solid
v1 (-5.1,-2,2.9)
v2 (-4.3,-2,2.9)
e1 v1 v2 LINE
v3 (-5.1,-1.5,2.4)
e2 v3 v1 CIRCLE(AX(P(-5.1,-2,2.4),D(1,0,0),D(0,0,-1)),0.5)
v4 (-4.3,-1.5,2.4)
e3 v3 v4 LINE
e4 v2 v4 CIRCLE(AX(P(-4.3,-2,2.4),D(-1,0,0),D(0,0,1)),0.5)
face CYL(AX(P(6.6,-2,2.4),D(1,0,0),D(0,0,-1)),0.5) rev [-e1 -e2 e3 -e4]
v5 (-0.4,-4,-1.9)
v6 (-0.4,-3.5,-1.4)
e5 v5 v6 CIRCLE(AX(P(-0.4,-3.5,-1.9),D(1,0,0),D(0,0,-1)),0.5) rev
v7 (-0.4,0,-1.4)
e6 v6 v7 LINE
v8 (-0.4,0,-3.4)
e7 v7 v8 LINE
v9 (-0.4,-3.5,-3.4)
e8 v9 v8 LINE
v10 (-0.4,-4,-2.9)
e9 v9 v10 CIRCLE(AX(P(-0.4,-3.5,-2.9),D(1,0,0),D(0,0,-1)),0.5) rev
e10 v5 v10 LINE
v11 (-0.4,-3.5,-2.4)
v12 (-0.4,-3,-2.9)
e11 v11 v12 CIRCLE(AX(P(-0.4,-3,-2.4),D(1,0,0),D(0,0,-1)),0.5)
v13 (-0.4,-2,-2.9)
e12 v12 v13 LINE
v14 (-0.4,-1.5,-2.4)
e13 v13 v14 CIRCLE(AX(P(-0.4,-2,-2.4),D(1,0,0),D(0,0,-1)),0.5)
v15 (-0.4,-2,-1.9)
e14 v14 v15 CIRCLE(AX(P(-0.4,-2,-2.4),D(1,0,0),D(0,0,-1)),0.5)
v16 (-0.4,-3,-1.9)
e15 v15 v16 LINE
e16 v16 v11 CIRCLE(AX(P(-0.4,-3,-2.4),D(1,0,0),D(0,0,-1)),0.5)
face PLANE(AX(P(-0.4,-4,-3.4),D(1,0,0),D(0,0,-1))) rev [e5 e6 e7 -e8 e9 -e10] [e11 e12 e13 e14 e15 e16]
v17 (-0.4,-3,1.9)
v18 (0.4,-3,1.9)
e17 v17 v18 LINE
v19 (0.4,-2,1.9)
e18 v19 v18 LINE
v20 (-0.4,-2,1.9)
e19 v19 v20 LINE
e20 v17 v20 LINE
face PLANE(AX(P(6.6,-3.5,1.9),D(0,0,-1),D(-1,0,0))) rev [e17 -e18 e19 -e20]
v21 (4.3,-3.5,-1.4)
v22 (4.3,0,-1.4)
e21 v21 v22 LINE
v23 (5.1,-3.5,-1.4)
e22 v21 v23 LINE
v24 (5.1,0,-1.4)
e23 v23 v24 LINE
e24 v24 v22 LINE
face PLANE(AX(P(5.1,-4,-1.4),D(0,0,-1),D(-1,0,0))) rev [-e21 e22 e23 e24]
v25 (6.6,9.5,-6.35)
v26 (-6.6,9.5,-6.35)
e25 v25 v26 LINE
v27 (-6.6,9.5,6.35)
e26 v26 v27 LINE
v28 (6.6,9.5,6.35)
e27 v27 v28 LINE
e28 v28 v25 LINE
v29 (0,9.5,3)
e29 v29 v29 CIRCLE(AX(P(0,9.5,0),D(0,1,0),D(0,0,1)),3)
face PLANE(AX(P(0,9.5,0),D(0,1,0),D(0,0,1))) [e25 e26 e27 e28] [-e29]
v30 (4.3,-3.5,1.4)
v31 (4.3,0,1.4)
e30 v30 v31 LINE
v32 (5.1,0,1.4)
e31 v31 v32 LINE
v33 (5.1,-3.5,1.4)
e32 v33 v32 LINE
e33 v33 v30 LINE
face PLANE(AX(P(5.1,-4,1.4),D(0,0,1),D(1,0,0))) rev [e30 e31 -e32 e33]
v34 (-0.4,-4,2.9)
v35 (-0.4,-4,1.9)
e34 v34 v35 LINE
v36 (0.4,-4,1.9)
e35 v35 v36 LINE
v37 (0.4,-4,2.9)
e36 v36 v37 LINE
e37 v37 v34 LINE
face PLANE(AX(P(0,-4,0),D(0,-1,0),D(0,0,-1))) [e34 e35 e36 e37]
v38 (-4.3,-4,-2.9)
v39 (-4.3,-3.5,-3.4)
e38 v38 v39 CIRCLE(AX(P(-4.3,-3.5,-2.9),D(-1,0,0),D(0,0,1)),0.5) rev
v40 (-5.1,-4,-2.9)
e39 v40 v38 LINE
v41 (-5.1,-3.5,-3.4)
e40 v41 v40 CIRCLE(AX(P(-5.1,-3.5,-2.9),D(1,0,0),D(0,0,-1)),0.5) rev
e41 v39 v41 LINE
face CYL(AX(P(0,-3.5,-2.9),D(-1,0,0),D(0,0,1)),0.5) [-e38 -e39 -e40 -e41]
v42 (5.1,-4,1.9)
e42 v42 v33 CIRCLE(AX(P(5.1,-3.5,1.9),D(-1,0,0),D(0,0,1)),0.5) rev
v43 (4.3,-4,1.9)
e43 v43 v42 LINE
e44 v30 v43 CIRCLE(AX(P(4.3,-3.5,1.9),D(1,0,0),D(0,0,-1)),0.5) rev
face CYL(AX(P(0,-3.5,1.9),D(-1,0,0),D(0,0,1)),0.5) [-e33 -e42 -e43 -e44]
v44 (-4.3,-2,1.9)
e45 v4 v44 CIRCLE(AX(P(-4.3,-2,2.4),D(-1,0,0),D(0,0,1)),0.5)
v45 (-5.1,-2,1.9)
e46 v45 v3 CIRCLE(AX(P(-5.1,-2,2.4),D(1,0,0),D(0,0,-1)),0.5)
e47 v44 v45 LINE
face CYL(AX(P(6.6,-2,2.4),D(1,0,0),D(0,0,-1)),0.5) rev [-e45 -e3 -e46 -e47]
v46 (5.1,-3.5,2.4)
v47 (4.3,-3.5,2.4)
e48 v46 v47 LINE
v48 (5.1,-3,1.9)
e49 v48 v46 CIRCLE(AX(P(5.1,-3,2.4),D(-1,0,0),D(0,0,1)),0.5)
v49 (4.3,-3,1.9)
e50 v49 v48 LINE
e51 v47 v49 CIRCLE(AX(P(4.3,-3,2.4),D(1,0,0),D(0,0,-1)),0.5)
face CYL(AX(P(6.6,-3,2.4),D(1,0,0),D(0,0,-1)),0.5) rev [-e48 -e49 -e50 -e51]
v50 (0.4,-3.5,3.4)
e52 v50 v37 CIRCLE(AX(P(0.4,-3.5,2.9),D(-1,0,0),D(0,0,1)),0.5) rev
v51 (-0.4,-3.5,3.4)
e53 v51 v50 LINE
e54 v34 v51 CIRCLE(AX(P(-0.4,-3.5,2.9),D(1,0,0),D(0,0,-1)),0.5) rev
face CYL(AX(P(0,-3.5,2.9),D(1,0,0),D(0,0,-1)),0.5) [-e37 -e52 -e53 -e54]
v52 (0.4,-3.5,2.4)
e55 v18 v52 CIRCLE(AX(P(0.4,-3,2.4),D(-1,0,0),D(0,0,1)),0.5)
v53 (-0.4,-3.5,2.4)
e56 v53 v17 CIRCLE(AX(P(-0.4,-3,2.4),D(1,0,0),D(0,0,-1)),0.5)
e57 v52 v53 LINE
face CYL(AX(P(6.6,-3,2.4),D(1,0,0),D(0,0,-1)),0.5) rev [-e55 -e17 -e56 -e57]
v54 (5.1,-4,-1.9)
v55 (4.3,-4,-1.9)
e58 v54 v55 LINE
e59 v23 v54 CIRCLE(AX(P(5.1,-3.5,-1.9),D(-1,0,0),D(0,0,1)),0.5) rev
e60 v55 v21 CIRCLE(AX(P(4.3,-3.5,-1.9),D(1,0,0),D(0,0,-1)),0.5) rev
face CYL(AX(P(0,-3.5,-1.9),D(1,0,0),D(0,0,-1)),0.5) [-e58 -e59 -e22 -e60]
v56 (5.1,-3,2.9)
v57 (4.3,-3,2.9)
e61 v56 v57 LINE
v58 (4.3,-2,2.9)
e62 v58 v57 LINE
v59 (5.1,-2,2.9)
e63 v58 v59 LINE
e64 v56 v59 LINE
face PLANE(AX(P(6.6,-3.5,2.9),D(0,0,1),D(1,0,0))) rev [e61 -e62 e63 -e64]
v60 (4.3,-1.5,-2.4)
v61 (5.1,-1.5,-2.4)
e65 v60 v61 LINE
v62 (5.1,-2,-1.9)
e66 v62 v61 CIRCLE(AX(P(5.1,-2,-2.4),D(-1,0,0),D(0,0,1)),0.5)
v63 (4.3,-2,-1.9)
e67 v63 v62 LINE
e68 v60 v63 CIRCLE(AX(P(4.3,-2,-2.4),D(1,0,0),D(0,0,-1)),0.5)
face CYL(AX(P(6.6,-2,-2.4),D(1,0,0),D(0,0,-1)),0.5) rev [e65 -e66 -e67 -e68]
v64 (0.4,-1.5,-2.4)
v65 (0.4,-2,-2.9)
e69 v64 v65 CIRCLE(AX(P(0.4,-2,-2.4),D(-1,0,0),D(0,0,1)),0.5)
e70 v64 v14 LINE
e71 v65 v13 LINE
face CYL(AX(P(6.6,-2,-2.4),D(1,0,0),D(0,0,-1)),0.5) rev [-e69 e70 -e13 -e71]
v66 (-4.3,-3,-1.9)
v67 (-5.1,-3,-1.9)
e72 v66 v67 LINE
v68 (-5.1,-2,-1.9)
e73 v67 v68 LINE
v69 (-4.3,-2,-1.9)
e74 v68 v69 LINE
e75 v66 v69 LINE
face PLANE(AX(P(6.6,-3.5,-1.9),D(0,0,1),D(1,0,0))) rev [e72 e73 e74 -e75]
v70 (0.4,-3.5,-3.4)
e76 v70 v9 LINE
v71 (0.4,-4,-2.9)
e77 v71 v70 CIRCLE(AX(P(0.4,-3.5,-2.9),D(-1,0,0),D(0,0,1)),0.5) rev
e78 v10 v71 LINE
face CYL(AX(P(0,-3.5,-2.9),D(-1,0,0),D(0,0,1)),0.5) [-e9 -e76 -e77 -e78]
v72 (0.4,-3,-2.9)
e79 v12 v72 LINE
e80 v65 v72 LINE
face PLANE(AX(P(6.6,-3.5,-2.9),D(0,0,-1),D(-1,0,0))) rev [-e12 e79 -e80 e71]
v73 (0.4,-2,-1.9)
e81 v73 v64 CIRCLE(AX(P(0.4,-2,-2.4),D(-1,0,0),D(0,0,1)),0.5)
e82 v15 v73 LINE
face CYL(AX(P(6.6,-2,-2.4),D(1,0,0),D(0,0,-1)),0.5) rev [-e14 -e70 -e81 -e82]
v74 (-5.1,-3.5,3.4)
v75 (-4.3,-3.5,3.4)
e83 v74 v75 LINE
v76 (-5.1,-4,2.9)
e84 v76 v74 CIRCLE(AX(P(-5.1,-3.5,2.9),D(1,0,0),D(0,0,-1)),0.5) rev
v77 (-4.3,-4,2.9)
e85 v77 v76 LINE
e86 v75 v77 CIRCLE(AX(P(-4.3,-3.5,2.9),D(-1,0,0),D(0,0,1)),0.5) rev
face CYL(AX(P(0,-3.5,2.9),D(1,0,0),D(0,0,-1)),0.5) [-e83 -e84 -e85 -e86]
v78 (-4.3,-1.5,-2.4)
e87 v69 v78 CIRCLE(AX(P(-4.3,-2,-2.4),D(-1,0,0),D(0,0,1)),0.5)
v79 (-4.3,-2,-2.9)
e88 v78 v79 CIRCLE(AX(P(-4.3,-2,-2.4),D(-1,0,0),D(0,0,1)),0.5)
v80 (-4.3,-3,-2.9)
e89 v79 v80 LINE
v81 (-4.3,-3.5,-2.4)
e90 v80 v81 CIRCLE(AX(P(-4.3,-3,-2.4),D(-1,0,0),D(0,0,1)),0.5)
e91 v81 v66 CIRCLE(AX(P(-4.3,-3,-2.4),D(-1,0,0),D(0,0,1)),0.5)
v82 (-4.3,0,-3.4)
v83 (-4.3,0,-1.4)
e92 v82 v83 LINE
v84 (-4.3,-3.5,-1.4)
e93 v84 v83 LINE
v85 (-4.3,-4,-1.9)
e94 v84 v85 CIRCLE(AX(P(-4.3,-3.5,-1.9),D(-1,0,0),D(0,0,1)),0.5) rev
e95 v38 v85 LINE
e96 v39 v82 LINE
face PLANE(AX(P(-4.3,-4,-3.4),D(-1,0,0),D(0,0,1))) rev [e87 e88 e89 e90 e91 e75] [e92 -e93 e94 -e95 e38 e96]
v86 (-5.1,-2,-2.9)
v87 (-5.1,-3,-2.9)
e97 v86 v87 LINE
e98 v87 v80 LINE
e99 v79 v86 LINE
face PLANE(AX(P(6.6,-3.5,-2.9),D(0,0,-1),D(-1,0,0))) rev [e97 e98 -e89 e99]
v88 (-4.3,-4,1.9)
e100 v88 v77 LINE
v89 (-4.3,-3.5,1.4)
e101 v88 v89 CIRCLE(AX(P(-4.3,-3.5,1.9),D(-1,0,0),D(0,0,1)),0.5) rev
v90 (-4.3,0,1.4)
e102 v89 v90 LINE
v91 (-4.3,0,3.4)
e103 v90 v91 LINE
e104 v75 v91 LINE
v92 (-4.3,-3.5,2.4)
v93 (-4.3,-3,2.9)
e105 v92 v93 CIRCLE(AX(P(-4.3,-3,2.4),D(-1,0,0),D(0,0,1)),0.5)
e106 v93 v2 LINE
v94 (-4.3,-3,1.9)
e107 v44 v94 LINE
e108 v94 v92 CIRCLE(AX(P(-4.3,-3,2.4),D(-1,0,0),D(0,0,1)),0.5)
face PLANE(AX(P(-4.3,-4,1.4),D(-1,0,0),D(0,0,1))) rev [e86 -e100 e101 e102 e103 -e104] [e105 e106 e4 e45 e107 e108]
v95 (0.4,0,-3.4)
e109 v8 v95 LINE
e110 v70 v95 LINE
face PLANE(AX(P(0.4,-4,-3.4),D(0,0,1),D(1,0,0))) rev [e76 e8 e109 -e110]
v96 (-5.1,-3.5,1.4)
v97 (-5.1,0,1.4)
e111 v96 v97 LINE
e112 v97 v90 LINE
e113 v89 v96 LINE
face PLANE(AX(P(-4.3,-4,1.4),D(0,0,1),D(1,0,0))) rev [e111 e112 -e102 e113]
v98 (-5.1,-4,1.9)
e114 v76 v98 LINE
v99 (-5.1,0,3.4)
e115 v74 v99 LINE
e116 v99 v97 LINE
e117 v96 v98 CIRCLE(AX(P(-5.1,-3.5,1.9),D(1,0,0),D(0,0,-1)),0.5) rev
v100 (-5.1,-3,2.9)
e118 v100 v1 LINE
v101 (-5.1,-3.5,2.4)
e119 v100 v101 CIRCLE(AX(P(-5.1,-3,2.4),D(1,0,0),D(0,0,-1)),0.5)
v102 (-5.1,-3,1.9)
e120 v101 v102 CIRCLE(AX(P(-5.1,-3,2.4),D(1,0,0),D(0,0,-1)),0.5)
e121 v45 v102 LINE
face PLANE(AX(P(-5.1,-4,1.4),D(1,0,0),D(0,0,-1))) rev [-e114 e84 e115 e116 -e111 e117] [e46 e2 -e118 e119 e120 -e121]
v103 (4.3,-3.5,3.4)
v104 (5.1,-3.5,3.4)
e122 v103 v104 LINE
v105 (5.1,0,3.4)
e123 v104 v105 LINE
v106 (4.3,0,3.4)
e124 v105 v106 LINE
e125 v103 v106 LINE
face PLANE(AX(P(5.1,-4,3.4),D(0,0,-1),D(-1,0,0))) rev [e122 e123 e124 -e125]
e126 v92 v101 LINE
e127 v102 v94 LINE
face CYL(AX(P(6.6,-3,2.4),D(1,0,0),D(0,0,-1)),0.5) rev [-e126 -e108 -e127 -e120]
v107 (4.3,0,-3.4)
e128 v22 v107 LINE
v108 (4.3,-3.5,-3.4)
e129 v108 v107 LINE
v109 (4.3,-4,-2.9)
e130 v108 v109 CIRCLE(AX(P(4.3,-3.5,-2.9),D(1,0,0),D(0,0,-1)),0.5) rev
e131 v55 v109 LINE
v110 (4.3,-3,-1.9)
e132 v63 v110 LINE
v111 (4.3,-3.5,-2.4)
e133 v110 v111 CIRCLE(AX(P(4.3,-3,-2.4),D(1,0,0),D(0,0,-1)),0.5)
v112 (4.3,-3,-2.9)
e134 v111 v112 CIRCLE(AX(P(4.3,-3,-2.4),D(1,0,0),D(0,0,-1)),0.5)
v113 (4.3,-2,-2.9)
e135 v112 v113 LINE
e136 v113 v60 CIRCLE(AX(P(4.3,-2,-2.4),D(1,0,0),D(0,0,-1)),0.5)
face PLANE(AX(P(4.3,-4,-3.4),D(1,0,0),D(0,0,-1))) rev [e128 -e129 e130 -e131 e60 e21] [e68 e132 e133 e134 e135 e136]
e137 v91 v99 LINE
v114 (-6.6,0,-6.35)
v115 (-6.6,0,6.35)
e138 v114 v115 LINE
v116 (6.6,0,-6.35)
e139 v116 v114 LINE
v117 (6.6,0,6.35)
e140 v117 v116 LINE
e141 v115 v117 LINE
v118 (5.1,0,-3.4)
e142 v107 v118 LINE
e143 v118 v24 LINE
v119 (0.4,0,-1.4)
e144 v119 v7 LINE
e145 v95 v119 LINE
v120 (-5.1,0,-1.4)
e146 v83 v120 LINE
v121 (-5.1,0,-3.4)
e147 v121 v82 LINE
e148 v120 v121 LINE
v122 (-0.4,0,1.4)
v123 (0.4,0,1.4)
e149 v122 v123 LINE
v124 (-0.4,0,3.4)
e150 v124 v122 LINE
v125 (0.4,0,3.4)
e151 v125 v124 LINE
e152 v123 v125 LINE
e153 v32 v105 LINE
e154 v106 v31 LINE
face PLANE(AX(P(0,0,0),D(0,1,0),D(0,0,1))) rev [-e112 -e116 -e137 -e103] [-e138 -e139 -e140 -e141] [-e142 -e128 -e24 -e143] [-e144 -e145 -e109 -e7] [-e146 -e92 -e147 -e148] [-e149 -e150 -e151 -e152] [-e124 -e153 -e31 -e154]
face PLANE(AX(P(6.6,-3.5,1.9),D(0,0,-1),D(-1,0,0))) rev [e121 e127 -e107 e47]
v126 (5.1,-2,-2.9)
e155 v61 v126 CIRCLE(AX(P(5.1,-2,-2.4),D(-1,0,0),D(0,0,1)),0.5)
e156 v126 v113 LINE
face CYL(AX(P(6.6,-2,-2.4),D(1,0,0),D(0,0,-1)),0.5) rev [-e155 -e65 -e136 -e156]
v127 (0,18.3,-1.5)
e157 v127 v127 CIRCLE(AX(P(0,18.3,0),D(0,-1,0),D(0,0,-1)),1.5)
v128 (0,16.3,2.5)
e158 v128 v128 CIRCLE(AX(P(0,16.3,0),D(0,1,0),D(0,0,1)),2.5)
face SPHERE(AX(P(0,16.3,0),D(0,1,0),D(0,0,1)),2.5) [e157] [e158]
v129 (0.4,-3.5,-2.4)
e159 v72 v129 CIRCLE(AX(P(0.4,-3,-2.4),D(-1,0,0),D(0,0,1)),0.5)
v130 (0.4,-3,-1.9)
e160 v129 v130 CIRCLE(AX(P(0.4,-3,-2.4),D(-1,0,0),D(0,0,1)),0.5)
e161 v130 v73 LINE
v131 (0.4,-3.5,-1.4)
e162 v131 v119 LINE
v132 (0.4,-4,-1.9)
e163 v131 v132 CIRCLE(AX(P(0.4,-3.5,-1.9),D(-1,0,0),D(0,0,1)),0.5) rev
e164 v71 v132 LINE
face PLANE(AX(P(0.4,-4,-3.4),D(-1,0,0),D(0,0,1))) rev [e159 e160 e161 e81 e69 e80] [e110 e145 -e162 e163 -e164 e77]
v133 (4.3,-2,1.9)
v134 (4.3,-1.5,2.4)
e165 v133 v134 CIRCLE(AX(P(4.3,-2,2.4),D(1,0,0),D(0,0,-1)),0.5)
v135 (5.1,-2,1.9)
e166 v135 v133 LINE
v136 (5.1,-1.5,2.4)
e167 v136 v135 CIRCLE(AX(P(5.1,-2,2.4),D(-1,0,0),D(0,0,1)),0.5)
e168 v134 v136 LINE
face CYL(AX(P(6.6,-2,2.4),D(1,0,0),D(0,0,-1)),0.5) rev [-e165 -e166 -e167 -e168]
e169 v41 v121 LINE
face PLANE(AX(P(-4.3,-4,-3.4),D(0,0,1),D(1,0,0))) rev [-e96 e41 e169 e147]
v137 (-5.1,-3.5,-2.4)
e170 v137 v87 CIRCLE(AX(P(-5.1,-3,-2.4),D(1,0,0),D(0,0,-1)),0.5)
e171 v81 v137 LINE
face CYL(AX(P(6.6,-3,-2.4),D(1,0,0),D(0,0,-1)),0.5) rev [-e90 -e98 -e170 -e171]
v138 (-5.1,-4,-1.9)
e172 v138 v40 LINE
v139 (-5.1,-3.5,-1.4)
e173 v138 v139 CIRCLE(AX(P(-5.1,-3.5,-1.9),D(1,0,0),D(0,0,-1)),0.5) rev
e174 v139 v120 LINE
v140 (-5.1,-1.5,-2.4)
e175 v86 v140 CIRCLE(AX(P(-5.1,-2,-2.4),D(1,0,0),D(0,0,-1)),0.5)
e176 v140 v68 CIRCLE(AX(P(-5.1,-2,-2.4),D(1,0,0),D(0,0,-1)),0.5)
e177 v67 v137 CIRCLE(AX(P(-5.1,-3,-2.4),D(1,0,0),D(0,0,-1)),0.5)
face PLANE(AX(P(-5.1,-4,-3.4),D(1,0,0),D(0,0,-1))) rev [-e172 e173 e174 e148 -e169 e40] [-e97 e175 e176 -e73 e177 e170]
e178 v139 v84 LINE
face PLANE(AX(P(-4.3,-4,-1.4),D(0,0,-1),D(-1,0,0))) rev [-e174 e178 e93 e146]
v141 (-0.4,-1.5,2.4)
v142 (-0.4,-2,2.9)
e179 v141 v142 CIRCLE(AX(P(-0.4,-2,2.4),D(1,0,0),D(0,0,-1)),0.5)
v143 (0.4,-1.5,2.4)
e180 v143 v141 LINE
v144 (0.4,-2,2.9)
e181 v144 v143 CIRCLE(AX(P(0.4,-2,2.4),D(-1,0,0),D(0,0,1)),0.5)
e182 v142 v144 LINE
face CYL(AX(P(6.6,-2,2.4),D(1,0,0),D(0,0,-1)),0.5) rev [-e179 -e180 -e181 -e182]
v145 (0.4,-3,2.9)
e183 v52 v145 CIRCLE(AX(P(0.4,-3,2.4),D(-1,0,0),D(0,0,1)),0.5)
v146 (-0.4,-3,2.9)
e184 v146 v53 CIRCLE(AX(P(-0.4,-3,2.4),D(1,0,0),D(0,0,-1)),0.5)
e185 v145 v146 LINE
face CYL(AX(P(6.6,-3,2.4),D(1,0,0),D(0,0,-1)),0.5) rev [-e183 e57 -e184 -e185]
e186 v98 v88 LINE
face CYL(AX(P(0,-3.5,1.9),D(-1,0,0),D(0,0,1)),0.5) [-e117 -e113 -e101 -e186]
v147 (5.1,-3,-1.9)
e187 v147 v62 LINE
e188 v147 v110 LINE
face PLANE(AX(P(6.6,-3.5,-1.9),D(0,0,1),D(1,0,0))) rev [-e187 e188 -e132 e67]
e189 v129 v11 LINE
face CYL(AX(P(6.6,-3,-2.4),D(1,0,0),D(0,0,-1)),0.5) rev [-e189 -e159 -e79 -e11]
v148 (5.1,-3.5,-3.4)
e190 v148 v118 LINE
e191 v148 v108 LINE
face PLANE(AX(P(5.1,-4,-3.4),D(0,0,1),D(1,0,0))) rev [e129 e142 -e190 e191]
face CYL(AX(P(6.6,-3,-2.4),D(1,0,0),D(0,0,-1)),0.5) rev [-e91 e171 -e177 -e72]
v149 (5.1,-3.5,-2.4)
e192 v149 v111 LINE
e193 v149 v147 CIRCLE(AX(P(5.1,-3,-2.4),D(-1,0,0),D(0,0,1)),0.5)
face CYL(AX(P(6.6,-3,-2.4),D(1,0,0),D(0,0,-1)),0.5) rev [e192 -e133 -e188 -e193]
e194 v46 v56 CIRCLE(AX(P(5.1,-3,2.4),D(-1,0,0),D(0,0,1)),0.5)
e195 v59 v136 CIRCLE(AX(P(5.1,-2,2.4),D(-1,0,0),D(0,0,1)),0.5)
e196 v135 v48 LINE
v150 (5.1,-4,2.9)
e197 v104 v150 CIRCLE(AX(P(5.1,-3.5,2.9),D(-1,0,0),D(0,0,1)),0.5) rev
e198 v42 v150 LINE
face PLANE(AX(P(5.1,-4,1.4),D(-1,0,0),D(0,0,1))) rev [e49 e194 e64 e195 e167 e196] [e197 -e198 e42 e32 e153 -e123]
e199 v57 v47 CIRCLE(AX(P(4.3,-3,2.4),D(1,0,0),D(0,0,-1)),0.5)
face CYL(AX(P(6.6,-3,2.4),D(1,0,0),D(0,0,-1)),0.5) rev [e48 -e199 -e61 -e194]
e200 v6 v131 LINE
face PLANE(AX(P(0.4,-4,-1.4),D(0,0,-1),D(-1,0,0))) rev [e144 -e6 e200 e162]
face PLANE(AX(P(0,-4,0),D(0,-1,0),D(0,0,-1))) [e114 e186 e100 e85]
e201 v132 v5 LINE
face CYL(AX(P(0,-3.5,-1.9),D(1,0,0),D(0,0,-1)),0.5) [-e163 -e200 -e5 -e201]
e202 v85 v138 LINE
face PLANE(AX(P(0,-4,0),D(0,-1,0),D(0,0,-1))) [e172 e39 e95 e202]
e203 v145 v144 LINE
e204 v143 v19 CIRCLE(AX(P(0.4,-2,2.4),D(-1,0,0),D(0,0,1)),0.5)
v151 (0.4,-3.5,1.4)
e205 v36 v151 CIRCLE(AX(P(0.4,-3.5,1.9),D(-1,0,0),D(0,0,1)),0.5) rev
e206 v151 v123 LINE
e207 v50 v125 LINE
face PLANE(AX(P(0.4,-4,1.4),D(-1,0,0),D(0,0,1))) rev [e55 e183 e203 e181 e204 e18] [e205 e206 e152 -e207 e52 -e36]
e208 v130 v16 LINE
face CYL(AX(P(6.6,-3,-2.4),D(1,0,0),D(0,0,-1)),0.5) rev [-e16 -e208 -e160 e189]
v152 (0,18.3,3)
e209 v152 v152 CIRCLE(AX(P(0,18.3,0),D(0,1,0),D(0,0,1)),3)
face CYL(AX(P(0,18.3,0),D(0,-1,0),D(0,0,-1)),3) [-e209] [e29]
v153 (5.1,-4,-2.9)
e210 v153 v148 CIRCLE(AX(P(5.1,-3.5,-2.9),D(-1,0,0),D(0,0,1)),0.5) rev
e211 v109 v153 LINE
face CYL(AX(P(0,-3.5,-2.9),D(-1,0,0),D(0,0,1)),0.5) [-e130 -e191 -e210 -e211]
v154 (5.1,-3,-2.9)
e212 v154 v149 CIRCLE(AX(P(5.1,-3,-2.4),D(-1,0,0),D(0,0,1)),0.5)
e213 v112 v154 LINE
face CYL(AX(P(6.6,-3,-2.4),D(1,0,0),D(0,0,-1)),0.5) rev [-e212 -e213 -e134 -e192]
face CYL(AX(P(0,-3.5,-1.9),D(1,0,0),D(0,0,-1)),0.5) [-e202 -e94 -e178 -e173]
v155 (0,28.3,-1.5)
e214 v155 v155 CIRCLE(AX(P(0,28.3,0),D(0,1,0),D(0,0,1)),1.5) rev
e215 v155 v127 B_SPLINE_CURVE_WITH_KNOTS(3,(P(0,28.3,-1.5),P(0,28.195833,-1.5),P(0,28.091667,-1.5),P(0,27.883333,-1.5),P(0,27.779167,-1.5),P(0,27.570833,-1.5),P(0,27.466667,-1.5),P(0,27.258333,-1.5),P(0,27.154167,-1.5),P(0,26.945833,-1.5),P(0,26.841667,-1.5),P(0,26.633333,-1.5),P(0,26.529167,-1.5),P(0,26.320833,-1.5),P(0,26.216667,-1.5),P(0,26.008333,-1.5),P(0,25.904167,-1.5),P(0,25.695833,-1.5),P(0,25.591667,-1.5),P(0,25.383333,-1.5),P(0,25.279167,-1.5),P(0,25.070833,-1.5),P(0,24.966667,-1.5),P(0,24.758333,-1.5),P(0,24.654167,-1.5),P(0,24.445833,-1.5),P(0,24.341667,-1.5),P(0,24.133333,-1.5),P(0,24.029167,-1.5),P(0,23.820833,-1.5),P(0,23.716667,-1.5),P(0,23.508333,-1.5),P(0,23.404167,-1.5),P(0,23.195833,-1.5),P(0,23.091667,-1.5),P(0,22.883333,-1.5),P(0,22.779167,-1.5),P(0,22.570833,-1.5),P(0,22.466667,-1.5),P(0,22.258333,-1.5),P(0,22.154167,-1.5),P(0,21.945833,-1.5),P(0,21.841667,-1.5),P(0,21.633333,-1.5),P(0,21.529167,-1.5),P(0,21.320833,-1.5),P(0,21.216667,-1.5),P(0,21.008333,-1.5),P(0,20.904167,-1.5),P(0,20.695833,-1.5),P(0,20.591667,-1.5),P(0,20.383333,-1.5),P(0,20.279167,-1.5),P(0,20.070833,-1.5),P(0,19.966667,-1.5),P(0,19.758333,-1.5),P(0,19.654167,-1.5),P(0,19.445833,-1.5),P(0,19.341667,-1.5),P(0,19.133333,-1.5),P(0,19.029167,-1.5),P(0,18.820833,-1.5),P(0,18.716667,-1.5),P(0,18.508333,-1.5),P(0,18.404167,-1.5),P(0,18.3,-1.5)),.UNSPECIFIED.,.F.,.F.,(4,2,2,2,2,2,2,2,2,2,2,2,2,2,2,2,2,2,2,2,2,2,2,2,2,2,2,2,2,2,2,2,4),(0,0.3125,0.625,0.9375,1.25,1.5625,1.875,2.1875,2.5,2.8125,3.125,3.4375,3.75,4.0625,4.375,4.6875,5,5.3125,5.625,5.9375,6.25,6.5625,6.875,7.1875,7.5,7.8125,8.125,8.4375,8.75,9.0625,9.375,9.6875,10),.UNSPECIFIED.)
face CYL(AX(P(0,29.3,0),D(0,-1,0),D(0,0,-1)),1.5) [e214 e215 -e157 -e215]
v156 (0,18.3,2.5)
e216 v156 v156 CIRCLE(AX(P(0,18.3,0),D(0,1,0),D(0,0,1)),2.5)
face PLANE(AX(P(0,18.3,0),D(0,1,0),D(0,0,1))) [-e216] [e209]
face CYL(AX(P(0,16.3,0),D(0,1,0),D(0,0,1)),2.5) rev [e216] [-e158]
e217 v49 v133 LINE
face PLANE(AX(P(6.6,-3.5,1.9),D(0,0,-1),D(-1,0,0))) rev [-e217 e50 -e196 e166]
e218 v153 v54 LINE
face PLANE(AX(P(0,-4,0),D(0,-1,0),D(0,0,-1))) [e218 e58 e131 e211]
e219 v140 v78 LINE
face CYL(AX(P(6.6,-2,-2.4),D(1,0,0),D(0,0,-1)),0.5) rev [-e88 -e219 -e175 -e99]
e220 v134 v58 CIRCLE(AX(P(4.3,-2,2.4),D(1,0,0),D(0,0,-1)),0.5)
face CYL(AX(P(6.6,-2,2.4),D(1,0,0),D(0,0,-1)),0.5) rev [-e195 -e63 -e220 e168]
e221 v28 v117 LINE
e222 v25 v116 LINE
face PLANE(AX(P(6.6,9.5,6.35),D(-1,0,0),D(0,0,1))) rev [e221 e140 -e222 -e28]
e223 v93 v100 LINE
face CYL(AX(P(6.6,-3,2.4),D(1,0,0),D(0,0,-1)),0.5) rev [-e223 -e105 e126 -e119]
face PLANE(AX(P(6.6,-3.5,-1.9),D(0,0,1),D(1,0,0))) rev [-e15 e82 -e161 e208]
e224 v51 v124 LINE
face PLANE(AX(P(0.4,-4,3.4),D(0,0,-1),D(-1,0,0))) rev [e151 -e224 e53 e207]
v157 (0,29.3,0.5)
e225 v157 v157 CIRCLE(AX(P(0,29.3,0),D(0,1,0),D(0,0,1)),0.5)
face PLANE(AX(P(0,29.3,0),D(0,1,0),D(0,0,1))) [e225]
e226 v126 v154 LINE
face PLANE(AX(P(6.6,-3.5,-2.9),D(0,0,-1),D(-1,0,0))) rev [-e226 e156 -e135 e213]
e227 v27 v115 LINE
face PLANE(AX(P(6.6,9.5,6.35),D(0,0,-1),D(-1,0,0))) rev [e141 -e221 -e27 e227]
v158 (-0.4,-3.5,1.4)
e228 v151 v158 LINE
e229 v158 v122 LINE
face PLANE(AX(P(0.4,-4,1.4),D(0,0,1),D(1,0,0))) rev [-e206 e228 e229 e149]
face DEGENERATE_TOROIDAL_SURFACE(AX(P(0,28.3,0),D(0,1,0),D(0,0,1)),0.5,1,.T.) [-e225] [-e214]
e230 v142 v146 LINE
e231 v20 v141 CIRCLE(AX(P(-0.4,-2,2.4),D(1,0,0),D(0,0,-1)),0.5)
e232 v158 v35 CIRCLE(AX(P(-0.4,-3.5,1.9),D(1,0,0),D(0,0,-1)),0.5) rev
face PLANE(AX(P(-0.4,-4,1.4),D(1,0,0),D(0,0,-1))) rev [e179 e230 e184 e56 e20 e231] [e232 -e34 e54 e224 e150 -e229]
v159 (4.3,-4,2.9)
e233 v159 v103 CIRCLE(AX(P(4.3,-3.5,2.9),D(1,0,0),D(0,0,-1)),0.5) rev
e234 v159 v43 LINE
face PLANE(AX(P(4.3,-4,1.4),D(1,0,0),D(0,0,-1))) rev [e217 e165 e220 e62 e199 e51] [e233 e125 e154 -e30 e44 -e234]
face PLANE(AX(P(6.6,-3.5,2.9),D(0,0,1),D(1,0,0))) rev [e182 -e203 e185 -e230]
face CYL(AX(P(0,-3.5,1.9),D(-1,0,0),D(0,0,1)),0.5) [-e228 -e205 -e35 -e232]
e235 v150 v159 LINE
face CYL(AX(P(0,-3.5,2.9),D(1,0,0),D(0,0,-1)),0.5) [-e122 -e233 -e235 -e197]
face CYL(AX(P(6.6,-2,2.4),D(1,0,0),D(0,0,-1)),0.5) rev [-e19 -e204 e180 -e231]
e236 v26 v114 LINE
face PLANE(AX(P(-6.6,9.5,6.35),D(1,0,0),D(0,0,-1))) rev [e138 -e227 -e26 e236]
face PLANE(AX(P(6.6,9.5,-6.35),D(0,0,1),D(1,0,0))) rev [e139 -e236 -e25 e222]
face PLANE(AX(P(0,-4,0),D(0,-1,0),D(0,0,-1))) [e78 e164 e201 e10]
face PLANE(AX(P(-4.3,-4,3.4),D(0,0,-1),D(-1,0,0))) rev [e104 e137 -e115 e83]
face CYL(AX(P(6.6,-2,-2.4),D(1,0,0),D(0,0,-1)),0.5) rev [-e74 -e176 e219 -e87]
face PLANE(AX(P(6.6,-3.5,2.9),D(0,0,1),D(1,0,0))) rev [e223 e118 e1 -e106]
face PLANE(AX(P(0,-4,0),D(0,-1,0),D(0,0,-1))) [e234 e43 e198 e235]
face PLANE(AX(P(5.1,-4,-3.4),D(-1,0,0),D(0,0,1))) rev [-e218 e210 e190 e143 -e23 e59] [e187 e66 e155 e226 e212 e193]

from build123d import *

# Parameters (mm, degrees)
SKETCH1_W           = 13.2
SKETCH1_H           = 12.7
BOSS_EXTRUDE1_DEPTH = 9.5
SKETCH2_R           = 3
BOSS_EXTRUDE2_DEPTH = 8.8
SKETCH4_R           = 2.5
CUT_EXTRUDE1_DEPTH  = 2
SKETCH5_R           = 1.5
BOSS_EXTRUDE3_DEPTH = 13
REVOLVE2_ANGLE      = 180
FILLET1_R           = 1
SKETCH6_W           = 0.8
SKETCH6_H           = 2
BOSS_EXTRUDE4_DEPTH = 4
SKETCH7_W           = 1
SKETCH7_H           = 2
CUT_EXTRUDE2_DEPTH  = 33.182332109
FILLET2_R           = 0.5


with BuildPart() as part:
    # Sketch1 → Boss-Extrude1 (new body)
    with BuildSketch(Plane(origin=(0, 0, 0), x_dir=(1, 0, 0), z_dir=(0, 1, 0))):
        Rectangle(SKETCH1_W, SKETCH1_H)
    extrude(amount=BOSS_EXTRUDE1_DEPTH)

    # Sketch2 → Boss-Extrude2 (add)
    with BuildSketch(Plane(origin=(0, 9.5, 0), x_dir=(1, 0, 0), z_dir=(0, 1, 0))):
        with Locations(Location((0, 0, 0), (0, 0, 270))):
            Circle(SKETCH2_R)
    extrude(amount=BOSS_EXTRUDE2_DEPTH)

    # Sketch4 → Cut-Extrude1 (cut)
    with BuildSketch(Plane(origin=(0, 18.3, 0), x_dir=(1, 0, 0), z_dir=(0, 1, 0))):
        with Locations(Location((0, 0, 0), (0, 0, 270))):
            Circle(SKETCH4_R)
    extrude(amount=-CUT_EXTRUDE1_DEPTH, mode=Mode.SUBTRACT)

    # Sketch5 → Boss-Extrude3 (add)
    with BuildSketch(Plane(origin=(0, 16.3, 0), x_dir=(1, 0, 0), z_dir=(0, 1, 0))):
        with Locations(Location((0, 0, 0), (0, 0, 90))):
            Circle(SKETCH5_R)
    extrude(amount=BOSS_EXTRUDE3_DEPTH)

    # Sketch3 → Revolve2 (revolve)
    with BuildSketch(Plane(origin=(0, 16.3, 0), x_dir=(1, 0, 0), z_dir=(0, 1, 0))):
        with BuildLine():
            Line((0, -2.5), (0, 2.5))
            ThreePointArc((0, 2.5), (-2.5, 0), (0, -2.5))
        make_face()
    revolve(axis=Axis((0, 16.3, 3), (0, 0, -1)), revolution_arc=REVOLVE2_ANGLE)

    # Fillet1
    fillet1_edges = [part.edges().sort_by_distance(p)[0] for p in [
        (0, 29.3, 1.5),
    ]]
    fillet(fillet1_edges, radius=FILLET1_R)

    # Sketch6 → Boss-Extrude4 (add)
    with BuildSketch(Plane.XZ):
        with Locations((-4.7, 2.4)):
            Rectangle(SKETCH6_W, SKETCH6_H)
        with Locations((-4.7, -2.4)):
            Rectangle(SKETCH6_W, SKETCH6_H)
        with Locations((0, -2.4)):
            Rectangle(SKETCH6_W, SKETCH6_H)
        with Locations((0, 2.4)):
            Rectangle(SKETCH6_W, SKETCH6_H)
        with Locations((4.7, 2.4)):
            Rectangle(SKETCH6_W, SKETCH6_H)
        with Locations((4.7, -2.4)):
            Rectangle(SKETCH6_W, SKETCH6_H)
    extrude(amount=BOSS_EXTRUDE4_DEPTH)

    # Sketch7 → Cut-Extrude2 (cut, through all)
    with BuildSketch(Plane.ZY.offset(5.1)):
        with Locations((-2.4, -2.5)):
            Rectangle(SKETCH7_W, SKETCH7_H)
        with Locations((2.4, -2.5)):
            Rectangle(SKETCH7_W, SKETCH7_H)
    extrude(amount=-CUT_EXTRUDE2_DEPTH, mode=Mode.SUBTRACT)

    # Fillet2
    fillet2_edges = [part.edges().sort_by_distance(p)[0] for p in [
        (4.7, -3.5, 2.9),
        (4.7, -3.5, 1.9),
        (4.7, -3.5, -1.9),
        (4.7, -3.5, -2.9),
        (4.7, -1.5, -1.9),
        (4.7, -1.5, 2.9),
        (4.7, -1.5, 1.9),
        (4.7, -1.5, -2.9),
        (0, -1.5, 1.9),
        (0, -1.5, 2.9),
        (0, -3.5, 2.9),
        (0, -3.5, 1.9),
        (0, -3.5, -1.9),
        (0, -3.5, -2.9),
        (0, -1.5, -2.9),
        (0, -1.5, -1.9),
        (-4.7, -3.5, 2.9),
        (-4.7, -1.5, 2.9),
        (-4.7, -3.5, 1.9),
        (-4.7, -1.5, 1.9),
        (-4.7, -1.5, -1.9),
        (-4.7, -1.5, -2.9),
        (-4.7, -3.5, -1.9),
        (-4.7, -3.5, -2.9),
        (0, -4, -1.4),
        (0, -4, -3.4),
        (4.7, -4, -1.4),
        (4.7, -4, -3.4),
        (4.7, -4, 1.4),
        (4.7, -4, 3.4),
        (0, -4, 3.4),
        (0, -4, 1.4),
        (-4.7, -4, 3.4),
        (-4.7, -4, 1.4),
        (-4.7, -4, -1.4),
        (-4.7, -4, -3.4),
    ]]
    fillet(fillet2_edges, radius=FILLET2_R - 0.0001)  # a hair under: the kernel refuses the full size


solid = part.part
